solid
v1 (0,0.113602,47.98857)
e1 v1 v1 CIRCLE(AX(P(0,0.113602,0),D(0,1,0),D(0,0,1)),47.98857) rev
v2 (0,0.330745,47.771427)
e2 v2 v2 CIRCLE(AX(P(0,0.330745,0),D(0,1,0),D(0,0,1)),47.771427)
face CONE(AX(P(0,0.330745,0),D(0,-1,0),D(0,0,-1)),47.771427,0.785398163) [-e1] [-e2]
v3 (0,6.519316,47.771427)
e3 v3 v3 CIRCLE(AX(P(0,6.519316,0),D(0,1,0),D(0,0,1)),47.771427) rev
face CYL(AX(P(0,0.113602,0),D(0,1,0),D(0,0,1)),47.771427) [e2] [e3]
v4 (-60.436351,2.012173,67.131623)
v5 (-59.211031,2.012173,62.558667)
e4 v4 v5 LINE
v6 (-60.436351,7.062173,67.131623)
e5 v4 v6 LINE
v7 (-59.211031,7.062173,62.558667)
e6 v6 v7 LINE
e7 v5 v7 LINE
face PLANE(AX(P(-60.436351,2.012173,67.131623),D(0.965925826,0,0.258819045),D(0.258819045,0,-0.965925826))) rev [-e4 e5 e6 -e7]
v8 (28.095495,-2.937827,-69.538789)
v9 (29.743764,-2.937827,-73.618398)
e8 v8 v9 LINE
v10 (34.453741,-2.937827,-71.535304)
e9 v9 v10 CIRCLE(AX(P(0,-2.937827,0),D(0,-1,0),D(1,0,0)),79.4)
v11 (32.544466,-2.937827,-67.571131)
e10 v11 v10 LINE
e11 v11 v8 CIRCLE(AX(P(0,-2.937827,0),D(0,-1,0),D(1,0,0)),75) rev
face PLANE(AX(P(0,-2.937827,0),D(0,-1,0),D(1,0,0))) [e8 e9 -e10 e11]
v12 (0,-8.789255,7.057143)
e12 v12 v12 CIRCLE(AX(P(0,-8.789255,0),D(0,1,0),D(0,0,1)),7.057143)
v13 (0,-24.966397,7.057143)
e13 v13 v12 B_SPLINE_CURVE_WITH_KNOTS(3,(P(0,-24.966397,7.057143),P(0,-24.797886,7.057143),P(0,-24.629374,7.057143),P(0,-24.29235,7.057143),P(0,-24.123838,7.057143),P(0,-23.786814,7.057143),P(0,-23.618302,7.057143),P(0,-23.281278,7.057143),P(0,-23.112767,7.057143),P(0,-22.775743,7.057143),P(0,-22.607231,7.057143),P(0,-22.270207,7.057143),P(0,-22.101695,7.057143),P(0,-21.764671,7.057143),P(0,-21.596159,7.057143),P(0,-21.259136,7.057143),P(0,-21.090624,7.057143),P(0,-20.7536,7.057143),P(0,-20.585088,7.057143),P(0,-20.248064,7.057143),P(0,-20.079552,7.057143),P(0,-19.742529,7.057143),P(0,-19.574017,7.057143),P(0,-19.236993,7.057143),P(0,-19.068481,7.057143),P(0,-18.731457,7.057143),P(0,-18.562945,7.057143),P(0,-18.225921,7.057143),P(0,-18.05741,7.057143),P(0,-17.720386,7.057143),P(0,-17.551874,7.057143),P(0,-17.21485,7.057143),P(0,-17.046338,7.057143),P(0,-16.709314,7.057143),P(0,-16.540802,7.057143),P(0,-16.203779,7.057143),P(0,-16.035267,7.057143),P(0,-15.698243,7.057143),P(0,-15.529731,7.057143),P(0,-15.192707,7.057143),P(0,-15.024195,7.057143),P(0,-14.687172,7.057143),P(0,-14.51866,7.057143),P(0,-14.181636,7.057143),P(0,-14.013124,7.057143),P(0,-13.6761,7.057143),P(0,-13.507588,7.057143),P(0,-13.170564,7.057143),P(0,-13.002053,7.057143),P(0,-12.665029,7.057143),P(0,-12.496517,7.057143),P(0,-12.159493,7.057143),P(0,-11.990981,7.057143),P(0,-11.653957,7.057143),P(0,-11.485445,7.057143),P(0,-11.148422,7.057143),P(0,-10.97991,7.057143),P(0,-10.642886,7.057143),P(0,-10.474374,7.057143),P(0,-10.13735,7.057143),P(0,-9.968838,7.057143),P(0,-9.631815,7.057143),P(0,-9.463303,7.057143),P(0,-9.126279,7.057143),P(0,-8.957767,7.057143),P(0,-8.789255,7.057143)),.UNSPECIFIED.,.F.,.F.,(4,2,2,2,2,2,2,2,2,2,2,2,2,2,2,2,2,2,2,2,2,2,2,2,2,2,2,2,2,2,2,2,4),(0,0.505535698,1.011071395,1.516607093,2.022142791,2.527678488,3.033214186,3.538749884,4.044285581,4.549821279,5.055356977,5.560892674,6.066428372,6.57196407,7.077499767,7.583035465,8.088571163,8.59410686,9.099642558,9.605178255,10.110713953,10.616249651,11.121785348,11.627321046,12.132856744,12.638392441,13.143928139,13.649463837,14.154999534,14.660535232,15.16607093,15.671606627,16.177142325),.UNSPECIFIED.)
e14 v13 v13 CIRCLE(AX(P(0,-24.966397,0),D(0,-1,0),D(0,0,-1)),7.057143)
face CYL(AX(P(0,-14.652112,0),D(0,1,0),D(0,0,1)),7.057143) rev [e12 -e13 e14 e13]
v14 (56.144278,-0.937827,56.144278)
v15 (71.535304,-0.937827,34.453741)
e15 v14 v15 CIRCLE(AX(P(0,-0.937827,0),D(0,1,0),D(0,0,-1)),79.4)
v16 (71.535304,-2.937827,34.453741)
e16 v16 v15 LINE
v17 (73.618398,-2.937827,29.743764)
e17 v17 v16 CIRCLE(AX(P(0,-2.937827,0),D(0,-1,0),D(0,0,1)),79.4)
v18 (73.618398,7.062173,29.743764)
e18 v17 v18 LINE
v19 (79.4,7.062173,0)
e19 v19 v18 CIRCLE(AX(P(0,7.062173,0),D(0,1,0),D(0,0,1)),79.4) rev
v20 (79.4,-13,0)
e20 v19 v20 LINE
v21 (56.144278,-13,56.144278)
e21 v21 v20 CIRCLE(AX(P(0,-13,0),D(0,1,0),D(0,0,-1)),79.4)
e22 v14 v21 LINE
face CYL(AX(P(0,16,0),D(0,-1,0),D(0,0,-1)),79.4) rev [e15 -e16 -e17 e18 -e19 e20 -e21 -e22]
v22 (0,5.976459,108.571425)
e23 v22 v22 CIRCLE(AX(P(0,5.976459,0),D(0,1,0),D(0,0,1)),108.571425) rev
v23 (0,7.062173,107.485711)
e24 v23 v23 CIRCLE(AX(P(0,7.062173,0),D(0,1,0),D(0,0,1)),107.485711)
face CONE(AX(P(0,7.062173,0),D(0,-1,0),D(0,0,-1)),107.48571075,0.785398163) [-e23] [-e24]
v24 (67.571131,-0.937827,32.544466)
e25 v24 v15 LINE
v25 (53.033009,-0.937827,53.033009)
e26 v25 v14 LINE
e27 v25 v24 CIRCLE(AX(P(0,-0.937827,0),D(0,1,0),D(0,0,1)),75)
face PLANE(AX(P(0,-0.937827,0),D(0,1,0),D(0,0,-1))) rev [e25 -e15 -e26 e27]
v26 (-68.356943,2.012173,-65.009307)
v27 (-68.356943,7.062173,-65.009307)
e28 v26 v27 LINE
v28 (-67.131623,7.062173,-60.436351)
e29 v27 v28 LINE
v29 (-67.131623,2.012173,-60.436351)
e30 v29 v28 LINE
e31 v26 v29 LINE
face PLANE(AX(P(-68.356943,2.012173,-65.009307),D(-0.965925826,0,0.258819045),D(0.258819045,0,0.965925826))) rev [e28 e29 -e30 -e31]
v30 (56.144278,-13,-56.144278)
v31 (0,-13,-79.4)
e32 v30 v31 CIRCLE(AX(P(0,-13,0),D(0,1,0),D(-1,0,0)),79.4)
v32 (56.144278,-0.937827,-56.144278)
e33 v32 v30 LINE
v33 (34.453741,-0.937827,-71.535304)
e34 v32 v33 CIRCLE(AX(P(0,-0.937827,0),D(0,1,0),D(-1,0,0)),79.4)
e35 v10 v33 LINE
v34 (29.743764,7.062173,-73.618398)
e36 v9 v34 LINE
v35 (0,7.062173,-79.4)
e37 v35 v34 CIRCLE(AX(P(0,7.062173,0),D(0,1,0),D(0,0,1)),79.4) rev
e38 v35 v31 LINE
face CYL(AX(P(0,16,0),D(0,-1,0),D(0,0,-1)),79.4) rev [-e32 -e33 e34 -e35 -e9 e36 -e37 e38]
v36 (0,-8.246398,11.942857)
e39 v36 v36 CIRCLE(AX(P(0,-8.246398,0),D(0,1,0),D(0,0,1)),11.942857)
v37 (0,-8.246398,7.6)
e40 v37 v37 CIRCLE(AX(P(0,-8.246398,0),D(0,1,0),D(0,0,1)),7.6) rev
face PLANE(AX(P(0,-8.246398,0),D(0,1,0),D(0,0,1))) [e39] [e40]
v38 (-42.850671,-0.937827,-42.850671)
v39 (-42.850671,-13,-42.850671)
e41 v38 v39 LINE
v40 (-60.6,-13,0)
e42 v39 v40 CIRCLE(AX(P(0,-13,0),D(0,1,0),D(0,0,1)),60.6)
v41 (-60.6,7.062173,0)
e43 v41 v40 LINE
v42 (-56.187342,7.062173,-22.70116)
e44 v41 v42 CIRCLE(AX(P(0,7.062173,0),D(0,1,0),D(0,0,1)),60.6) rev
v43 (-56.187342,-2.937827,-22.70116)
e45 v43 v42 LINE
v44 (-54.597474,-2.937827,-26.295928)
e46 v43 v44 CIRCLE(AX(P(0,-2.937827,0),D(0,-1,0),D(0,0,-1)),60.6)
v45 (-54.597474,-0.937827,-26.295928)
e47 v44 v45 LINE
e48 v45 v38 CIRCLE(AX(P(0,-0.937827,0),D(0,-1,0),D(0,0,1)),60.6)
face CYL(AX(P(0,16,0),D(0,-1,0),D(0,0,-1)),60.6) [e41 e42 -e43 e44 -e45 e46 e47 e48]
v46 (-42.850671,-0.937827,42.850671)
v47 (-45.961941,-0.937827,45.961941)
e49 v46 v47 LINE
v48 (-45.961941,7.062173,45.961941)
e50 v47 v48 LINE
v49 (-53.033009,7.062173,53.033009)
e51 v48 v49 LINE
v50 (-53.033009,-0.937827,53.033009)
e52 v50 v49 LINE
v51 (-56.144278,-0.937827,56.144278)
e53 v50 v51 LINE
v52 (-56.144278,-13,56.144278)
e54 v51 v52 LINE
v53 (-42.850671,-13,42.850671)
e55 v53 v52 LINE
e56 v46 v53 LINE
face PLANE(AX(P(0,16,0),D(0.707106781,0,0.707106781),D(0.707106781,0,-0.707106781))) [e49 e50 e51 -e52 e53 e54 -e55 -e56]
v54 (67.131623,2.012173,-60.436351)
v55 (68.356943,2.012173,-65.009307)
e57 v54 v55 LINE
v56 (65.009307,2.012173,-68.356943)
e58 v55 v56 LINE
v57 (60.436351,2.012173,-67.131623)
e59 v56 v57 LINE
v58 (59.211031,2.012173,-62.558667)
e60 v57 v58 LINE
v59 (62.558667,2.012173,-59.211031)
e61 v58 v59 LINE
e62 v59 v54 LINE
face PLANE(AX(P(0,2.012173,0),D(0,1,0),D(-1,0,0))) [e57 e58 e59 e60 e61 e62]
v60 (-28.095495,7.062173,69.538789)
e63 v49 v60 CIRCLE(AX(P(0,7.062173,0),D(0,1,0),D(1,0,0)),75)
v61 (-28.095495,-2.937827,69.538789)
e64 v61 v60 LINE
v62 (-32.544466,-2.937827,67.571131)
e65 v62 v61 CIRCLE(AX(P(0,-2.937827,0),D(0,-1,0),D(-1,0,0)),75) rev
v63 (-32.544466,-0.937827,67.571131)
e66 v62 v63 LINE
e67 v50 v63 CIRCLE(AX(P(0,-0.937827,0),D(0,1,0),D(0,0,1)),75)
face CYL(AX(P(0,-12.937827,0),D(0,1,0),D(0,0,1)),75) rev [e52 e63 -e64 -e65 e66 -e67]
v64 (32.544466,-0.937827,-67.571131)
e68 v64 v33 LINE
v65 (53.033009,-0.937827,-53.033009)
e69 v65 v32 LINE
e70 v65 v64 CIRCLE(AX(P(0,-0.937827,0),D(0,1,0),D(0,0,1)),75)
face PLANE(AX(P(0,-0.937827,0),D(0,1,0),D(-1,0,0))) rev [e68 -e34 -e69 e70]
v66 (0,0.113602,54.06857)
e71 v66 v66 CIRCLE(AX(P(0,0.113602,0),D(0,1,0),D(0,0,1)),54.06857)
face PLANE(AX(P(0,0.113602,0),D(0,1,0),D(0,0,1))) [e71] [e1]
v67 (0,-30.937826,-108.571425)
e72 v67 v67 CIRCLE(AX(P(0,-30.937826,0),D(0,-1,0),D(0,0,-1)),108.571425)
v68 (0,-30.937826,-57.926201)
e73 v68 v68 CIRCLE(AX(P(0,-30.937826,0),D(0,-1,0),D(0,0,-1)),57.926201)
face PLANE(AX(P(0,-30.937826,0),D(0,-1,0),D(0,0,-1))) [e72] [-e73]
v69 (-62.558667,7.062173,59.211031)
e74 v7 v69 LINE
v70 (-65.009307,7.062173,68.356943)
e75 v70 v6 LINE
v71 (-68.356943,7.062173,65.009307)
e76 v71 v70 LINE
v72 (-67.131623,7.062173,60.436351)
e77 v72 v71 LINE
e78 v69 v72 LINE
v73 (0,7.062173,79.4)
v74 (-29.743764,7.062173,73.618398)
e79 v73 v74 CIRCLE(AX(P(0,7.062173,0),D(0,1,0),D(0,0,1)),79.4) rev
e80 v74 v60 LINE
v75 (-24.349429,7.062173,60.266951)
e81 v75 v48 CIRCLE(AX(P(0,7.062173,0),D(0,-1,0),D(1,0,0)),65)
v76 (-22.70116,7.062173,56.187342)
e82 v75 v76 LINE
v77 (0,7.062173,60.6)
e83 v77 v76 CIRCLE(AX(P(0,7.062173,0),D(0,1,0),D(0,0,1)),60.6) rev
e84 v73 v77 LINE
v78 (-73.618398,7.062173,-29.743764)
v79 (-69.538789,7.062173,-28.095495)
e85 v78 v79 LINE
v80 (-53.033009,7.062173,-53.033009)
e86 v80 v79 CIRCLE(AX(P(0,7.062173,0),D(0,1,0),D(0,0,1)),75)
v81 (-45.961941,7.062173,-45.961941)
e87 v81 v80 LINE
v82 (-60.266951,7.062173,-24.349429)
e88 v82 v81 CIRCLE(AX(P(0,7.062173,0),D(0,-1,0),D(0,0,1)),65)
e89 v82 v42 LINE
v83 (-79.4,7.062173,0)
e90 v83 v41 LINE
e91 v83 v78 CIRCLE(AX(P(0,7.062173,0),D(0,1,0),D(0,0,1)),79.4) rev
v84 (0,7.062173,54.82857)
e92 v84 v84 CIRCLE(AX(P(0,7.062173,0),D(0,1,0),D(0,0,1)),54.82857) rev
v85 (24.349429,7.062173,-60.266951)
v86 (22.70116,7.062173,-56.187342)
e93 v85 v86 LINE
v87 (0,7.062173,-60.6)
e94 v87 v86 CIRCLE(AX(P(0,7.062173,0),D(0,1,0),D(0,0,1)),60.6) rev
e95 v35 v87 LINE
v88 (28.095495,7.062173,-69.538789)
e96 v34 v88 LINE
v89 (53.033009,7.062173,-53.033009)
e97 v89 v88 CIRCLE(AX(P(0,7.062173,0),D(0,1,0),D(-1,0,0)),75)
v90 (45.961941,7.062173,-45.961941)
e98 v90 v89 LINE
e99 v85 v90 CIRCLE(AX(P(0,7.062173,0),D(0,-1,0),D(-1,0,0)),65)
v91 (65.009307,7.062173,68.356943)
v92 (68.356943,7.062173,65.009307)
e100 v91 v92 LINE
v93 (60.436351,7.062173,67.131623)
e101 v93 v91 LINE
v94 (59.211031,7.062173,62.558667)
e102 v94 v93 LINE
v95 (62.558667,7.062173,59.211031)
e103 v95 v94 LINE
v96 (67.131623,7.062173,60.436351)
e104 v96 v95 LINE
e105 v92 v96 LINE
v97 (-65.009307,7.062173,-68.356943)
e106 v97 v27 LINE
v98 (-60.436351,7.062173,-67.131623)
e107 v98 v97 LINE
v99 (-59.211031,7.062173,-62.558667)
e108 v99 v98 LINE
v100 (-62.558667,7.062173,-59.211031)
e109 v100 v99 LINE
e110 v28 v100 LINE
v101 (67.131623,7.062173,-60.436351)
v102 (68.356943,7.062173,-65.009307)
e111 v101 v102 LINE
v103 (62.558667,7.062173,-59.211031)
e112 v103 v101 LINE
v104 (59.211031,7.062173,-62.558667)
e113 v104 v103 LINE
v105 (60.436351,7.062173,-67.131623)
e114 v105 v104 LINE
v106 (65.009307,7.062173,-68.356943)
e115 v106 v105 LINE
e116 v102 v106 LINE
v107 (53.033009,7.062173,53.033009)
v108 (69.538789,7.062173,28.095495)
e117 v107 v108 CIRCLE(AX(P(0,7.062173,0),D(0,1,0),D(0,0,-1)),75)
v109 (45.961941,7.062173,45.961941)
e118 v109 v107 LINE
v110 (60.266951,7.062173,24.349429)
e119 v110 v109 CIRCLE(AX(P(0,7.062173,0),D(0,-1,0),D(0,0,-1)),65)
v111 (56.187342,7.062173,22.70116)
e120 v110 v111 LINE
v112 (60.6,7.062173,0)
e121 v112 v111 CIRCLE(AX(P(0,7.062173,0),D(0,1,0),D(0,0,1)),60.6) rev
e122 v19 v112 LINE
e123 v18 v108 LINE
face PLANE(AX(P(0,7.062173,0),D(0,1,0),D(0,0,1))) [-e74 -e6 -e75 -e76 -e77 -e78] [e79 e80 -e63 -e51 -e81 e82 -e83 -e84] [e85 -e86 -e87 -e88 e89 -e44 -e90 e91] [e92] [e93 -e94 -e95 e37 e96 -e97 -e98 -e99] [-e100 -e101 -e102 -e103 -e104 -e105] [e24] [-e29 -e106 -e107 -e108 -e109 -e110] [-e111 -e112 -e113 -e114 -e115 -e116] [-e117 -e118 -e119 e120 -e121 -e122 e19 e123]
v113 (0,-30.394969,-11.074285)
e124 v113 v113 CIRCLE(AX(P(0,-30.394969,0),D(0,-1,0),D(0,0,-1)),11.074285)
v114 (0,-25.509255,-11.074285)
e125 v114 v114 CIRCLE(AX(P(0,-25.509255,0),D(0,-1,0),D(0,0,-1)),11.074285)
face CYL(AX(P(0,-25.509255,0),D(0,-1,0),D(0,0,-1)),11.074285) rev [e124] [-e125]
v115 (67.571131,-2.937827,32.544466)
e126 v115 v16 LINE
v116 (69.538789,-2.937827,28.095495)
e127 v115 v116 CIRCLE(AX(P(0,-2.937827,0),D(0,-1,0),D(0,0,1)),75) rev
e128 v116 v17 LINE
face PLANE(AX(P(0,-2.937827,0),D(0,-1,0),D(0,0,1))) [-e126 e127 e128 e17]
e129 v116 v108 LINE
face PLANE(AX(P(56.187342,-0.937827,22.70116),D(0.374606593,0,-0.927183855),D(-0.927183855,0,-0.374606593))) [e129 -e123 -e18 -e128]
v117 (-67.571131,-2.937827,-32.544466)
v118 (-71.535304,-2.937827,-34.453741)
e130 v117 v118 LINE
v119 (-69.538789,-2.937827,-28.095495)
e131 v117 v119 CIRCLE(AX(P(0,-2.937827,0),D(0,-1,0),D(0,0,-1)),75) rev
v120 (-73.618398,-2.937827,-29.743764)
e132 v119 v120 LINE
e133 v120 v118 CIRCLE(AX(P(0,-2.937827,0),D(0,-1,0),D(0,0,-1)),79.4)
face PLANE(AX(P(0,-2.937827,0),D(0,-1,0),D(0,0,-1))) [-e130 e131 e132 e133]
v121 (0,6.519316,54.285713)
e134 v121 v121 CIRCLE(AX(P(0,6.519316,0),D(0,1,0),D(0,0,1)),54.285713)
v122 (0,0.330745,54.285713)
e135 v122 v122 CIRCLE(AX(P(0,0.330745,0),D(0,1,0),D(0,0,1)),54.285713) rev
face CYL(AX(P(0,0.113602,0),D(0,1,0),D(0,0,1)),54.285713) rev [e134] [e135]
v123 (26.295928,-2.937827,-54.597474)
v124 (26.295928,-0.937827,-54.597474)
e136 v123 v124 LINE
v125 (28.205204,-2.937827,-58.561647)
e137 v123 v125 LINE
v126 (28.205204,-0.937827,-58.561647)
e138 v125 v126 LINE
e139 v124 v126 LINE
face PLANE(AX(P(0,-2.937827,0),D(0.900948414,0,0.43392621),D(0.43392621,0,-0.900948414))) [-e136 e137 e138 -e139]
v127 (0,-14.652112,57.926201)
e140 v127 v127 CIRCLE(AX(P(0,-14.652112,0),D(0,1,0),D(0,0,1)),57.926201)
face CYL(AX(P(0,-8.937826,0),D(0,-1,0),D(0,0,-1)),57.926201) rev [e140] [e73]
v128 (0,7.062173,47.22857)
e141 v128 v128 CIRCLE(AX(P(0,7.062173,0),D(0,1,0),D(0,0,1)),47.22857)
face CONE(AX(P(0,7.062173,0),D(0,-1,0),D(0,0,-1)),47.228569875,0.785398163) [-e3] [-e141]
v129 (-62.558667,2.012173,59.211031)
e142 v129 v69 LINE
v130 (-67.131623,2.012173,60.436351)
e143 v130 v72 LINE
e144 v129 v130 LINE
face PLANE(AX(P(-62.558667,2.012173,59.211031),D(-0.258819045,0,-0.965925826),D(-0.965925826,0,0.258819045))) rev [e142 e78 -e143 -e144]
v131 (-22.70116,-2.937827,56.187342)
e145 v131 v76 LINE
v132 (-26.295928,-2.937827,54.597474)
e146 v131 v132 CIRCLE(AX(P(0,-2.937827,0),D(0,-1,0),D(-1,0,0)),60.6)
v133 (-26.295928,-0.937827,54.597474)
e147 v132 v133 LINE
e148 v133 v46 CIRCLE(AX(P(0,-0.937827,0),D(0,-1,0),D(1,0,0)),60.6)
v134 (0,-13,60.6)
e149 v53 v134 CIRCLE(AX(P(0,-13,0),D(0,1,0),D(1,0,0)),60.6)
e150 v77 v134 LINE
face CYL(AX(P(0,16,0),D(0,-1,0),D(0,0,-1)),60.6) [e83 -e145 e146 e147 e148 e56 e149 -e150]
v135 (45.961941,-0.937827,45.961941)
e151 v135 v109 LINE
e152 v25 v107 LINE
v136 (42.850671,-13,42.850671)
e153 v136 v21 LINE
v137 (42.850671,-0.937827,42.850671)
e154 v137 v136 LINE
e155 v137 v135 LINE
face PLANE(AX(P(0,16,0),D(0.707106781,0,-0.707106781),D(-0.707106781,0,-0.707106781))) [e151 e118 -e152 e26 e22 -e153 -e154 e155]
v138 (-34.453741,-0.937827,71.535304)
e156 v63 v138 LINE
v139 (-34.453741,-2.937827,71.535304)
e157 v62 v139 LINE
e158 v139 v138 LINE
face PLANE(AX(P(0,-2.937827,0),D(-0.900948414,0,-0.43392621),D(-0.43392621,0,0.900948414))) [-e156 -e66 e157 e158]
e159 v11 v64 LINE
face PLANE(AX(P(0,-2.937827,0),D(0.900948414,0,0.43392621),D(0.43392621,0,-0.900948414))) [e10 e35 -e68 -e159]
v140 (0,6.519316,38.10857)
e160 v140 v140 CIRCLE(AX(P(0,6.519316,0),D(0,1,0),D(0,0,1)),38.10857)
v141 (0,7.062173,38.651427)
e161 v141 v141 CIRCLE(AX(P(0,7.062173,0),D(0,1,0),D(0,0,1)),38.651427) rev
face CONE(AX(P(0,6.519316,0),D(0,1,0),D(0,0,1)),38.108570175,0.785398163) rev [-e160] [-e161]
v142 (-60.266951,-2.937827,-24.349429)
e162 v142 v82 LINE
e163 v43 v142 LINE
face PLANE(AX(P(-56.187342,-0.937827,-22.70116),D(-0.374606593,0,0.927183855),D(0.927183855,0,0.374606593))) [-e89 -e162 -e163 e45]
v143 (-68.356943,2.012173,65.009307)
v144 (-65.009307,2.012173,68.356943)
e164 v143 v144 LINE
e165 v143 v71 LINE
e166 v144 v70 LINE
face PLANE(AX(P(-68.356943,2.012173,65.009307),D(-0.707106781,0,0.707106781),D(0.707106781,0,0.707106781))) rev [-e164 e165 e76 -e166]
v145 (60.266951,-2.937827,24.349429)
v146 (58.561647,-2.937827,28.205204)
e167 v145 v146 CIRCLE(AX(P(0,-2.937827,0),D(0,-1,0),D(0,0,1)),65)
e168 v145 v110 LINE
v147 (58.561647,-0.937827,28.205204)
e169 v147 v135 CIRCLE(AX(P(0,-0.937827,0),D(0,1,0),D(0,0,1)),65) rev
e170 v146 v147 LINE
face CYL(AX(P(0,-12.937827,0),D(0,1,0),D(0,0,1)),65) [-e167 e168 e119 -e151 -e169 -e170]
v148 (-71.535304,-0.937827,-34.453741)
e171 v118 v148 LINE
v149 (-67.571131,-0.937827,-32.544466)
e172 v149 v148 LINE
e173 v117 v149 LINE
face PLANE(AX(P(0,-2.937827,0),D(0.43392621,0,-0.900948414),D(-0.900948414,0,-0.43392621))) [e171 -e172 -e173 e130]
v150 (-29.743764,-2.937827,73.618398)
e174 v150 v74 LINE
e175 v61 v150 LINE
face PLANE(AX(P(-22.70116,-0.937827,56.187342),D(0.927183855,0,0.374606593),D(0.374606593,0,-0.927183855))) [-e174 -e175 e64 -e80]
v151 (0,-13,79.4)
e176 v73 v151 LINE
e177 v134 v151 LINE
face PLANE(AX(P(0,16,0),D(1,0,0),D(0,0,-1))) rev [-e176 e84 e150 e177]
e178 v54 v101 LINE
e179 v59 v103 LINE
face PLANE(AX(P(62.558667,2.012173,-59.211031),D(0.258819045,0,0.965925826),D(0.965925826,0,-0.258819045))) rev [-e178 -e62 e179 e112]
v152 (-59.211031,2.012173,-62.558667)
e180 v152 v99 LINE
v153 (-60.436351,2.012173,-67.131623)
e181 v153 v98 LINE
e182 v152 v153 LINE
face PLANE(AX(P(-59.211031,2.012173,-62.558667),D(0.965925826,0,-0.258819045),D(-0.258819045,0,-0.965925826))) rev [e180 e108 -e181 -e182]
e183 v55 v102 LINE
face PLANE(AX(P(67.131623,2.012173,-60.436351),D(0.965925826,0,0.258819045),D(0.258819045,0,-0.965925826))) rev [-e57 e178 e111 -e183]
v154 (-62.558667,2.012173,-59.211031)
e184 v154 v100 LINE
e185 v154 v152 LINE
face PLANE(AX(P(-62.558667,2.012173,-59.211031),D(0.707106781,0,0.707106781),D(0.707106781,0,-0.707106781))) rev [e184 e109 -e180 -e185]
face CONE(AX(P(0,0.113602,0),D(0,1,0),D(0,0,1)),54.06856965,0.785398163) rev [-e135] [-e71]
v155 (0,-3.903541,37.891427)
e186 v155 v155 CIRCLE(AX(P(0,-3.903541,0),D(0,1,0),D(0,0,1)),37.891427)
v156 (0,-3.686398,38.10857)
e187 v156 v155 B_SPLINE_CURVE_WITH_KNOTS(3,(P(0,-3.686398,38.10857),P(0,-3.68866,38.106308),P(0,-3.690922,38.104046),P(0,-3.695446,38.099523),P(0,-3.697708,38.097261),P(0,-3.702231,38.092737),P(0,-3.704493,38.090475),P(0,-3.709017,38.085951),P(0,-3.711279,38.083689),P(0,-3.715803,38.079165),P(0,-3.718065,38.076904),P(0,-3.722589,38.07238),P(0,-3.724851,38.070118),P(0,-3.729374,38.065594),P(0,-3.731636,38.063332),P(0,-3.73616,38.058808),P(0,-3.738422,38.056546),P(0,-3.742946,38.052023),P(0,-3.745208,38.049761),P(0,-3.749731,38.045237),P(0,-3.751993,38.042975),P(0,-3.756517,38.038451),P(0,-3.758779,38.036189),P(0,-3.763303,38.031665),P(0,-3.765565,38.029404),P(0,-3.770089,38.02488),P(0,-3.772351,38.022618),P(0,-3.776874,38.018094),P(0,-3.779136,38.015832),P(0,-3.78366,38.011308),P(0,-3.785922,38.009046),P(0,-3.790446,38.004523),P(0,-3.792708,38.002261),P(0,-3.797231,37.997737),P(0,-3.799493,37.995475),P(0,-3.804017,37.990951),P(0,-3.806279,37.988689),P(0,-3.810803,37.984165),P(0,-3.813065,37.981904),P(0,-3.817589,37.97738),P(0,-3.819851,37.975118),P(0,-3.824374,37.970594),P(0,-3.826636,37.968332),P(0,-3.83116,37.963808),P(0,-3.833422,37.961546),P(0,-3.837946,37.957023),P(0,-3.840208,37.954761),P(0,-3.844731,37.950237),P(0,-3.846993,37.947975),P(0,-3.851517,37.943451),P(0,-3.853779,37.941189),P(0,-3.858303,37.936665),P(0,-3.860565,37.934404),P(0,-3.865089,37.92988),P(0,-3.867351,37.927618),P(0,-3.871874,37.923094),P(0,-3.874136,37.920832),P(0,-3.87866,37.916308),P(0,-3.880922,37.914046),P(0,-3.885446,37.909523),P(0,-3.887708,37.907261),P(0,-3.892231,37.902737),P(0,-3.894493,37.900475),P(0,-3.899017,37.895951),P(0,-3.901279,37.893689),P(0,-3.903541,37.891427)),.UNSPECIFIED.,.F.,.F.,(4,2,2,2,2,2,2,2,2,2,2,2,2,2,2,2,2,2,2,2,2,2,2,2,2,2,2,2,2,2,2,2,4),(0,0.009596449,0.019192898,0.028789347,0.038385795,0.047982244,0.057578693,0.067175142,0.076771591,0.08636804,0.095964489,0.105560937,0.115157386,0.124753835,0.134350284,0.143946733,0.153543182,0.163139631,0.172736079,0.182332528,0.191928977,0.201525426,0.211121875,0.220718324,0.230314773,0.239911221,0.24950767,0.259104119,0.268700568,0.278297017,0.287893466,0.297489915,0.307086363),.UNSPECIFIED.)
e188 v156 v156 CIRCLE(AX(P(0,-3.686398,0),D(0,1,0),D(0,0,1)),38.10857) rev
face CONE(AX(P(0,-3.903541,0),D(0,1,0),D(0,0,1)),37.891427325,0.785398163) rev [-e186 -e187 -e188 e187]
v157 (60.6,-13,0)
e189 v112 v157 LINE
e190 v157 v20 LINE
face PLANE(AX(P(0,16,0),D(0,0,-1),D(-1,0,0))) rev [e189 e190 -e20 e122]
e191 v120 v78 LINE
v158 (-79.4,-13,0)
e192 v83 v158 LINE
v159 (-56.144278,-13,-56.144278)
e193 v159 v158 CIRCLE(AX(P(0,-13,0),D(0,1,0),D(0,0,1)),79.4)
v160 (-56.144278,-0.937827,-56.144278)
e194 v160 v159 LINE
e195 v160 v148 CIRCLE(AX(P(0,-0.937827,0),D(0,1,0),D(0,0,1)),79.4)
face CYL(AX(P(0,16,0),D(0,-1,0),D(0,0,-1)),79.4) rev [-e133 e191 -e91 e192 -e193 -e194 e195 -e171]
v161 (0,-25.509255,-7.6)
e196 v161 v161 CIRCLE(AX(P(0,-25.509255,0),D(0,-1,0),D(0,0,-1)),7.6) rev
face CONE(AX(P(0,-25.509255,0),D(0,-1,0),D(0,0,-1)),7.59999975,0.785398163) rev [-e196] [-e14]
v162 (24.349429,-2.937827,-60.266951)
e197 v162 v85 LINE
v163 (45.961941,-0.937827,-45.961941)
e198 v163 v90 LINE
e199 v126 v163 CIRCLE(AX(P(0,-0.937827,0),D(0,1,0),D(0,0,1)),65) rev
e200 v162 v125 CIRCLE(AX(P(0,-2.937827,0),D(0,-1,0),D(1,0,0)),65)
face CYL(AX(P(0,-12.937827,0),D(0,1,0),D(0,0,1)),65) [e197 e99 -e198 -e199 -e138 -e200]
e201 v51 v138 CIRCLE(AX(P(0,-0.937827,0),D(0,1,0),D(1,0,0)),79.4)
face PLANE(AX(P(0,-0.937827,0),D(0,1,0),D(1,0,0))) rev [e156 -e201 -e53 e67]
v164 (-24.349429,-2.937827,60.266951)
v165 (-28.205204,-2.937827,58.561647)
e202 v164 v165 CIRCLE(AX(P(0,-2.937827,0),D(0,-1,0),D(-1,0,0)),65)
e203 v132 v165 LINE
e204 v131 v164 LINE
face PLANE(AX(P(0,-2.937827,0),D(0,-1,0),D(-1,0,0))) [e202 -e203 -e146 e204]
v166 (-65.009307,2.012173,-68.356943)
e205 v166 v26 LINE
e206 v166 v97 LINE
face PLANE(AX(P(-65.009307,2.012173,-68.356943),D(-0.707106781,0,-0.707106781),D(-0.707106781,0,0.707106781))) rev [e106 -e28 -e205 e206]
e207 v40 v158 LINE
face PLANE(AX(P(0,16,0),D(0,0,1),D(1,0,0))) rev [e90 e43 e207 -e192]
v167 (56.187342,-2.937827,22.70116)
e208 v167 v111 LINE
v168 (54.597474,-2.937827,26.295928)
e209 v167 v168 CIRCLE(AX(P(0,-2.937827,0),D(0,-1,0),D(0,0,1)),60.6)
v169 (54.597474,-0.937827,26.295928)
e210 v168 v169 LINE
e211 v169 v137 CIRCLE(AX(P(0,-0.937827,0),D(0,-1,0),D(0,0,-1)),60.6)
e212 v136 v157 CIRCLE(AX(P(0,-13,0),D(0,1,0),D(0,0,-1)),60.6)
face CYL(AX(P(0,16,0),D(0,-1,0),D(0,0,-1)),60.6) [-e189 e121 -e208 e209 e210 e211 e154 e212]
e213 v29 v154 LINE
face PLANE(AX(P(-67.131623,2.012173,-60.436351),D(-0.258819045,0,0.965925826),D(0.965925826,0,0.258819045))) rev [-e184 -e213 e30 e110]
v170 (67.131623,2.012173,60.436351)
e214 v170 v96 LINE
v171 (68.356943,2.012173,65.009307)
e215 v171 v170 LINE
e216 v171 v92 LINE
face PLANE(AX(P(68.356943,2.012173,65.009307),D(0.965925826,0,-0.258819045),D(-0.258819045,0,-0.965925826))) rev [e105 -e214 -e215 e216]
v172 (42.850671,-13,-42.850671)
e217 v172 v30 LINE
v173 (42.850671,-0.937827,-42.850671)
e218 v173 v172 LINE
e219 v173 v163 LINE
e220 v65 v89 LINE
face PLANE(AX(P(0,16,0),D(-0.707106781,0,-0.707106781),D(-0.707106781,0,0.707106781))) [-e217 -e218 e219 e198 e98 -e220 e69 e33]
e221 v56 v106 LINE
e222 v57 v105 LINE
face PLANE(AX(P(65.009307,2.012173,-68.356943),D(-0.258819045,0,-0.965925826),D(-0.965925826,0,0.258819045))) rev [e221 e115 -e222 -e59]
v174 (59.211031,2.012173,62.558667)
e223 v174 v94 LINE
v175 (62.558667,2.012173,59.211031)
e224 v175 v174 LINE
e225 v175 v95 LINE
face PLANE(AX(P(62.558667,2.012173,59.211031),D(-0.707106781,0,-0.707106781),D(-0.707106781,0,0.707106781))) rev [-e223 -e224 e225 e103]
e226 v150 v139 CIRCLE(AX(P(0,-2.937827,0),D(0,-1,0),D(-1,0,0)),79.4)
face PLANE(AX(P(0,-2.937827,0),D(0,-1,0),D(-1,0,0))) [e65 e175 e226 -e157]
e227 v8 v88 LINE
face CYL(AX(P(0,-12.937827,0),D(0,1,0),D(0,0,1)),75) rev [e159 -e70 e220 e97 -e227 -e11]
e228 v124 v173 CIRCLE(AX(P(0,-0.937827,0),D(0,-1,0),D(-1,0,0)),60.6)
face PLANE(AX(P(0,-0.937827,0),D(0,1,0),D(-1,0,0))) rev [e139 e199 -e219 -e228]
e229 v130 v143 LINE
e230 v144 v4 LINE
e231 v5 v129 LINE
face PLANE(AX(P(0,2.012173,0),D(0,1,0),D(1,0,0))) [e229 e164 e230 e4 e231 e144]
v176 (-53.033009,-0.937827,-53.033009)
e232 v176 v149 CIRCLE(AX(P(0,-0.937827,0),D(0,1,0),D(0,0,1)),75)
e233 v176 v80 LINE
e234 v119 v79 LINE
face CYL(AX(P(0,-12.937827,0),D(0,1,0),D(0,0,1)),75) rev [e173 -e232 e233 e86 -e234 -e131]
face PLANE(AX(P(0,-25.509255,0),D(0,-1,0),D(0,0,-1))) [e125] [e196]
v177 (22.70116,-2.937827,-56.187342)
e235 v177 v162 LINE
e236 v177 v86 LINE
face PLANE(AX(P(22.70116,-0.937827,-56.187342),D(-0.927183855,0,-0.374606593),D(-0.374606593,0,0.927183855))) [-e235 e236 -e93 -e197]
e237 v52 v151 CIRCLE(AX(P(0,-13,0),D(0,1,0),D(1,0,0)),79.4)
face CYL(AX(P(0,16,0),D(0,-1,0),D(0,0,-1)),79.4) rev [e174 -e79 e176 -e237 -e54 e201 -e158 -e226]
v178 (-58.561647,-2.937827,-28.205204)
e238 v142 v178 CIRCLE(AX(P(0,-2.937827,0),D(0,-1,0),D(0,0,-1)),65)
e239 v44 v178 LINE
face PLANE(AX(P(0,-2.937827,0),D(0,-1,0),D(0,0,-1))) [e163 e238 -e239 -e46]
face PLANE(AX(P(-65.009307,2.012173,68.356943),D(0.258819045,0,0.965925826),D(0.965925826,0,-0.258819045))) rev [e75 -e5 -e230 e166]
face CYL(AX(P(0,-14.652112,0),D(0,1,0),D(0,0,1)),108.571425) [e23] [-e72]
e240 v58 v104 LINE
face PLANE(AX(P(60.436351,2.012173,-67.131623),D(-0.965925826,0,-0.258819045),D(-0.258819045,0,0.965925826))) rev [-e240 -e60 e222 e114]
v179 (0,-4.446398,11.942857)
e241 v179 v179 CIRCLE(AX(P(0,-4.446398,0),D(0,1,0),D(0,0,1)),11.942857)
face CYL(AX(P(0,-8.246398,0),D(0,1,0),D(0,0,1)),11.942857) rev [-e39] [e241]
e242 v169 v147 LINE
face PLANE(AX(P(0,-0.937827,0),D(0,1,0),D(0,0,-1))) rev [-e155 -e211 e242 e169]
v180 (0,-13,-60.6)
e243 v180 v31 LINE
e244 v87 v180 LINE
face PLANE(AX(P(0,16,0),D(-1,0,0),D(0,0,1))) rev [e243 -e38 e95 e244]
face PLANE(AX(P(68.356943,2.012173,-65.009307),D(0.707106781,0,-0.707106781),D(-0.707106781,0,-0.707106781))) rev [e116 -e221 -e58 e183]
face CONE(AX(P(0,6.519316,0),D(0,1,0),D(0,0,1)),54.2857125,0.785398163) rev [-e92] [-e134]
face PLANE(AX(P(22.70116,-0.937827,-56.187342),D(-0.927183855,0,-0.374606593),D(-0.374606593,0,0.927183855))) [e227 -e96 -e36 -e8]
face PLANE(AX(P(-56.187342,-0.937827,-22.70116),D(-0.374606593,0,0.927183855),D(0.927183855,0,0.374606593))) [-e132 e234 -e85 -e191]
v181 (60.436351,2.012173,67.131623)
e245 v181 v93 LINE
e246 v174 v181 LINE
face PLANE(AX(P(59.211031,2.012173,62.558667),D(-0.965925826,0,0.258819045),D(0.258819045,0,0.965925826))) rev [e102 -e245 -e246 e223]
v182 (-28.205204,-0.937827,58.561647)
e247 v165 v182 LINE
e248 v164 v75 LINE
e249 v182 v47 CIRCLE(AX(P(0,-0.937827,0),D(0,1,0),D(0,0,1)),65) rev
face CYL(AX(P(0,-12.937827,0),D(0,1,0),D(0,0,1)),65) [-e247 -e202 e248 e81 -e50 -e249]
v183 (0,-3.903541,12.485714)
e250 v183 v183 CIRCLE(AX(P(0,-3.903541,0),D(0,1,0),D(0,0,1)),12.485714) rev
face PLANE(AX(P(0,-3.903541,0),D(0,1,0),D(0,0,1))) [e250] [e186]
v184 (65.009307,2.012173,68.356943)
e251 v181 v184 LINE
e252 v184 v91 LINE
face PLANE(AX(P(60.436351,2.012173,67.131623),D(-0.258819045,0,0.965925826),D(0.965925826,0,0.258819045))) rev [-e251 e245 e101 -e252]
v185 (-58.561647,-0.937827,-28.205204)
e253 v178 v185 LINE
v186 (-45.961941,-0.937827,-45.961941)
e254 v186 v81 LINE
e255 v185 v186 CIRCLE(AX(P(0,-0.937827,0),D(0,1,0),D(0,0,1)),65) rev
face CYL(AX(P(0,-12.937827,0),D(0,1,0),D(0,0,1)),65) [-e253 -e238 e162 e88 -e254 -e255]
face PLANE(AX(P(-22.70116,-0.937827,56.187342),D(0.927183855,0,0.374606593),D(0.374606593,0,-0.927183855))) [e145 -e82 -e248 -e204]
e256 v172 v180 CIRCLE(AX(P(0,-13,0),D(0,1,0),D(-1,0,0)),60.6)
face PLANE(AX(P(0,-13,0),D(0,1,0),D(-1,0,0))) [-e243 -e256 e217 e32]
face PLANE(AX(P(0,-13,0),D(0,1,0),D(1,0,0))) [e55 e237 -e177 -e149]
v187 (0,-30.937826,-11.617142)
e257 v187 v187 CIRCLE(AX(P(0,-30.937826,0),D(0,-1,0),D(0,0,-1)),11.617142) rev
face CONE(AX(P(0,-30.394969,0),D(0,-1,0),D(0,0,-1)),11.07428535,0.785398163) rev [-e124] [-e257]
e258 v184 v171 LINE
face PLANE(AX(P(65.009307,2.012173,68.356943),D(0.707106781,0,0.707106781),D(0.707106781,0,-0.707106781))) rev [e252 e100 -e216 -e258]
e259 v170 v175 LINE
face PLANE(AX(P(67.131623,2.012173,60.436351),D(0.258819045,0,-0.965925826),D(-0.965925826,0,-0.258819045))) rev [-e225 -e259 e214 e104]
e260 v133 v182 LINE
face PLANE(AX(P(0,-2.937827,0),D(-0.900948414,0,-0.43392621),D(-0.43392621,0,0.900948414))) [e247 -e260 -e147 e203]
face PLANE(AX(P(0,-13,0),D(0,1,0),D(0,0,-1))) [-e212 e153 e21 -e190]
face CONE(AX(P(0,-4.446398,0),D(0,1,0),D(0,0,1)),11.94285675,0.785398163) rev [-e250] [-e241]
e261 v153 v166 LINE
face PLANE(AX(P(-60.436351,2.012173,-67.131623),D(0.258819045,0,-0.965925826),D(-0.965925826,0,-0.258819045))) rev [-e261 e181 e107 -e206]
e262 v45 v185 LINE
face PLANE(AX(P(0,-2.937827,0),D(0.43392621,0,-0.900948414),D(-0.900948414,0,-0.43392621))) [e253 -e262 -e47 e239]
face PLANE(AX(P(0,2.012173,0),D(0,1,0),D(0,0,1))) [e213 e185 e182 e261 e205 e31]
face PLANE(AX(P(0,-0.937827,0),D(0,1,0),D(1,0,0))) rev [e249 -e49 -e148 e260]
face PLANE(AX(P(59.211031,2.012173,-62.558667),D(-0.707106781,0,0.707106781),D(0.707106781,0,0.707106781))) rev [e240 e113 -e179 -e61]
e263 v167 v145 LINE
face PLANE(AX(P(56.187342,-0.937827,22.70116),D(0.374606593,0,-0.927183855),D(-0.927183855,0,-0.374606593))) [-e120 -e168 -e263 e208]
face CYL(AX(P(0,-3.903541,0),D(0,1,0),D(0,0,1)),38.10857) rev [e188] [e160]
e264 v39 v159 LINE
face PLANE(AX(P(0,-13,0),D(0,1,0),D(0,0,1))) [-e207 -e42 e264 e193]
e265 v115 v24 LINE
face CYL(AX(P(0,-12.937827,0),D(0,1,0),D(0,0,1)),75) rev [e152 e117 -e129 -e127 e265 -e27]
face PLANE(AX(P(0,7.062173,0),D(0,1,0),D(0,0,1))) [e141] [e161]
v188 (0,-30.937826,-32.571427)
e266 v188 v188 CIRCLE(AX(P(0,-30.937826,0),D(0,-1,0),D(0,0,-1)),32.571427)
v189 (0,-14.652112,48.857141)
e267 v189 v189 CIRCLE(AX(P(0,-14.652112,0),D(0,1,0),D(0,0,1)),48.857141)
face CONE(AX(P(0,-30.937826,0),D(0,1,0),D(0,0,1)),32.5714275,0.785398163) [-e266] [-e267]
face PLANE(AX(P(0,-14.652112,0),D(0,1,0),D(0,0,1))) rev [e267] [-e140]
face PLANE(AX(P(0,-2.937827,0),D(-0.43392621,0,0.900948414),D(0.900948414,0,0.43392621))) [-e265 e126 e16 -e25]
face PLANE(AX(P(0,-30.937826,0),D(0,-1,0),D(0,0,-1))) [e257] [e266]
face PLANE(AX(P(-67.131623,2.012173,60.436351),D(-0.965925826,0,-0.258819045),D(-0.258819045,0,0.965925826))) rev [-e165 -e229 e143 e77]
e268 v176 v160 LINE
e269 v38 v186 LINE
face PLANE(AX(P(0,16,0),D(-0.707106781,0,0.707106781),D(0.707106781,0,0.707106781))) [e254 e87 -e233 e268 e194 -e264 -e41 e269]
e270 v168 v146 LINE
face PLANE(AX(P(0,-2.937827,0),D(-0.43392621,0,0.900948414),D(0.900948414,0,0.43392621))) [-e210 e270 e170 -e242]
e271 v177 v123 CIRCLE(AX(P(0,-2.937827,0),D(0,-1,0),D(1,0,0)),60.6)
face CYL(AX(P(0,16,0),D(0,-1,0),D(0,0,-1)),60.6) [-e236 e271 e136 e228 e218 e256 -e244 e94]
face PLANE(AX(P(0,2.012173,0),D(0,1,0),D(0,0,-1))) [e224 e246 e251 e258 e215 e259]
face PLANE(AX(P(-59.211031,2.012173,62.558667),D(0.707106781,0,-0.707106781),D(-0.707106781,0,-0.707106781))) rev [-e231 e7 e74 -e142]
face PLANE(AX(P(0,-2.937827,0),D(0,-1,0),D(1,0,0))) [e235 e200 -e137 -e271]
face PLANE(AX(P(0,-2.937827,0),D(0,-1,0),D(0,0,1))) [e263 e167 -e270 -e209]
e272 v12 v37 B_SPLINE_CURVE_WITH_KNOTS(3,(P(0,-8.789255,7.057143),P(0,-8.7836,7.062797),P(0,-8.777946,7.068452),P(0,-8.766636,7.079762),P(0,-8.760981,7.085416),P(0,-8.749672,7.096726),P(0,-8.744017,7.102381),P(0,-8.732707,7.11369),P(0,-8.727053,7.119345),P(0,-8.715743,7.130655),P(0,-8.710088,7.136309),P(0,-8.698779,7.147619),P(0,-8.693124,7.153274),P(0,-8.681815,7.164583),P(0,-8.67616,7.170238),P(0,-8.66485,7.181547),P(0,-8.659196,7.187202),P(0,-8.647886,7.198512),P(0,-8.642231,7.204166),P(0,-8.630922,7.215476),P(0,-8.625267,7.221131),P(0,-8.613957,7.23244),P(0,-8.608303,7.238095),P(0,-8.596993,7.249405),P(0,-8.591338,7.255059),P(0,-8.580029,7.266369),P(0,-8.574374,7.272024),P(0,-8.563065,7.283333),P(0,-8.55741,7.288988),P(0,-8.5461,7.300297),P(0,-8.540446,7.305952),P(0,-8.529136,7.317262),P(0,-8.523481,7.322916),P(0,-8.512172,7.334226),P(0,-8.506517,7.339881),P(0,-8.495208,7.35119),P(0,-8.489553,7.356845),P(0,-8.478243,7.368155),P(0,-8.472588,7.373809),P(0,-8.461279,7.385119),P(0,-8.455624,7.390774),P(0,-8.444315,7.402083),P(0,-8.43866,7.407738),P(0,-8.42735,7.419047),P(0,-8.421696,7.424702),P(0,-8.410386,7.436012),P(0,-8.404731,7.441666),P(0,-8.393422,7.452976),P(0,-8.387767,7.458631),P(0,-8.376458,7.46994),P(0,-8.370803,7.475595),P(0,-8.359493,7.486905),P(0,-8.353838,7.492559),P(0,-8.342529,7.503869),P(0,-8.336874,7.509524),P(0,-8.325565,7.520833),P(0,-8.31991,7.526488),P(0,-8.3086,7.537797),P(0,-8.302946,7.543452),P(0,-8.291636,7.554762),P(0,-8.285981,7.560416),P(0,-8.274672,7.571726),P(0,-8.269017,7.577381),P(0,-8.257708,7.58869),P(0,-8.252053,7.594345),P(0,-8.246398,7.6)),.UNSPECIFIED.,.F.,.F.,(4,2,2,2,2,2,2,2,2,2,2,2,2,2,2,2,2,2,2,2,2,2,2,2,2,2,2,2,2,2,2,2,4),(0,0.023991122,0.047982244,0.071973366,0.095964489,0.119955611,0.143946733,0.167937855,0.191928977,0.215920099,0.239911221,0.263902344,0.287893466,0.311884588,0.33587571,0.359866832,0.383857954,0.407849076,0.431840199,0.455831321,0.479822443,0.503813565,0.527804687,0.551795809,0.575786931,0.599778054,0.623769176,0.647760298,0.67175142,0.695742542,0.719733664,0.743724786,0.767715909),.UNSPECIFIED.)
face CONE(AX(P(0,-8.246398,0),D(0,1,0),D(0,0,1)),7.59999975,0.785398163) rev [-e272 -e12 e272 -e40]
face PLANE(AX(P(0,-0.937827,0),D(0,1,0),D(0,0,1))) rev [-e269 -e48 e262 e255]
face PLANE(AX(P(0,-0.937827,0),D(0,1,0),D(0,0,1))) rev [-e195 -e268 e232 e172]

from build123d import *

# Parameters (mm, degrees)
SKETCH2_R                 = 50
BOSS_EXTRUDE1_DEPTH       = 10
SKETCH8_R                 = 17.55
CUT_EXTRUDE4_DEPTH        = 5.05
SKETCH12_R                = 3.25
CUT_EXTRUDE7_DEPTH        = 71.890778667
SKETCH13_R                = 5.5
CUT_EXTRUDE8_DEPTH        = 2
SKETCH14_R                = 15
SKETCH14_R_2              = 3.25
BOSS_EXTRUDE3_DEPTH       = 7.5
CHAMFER1_SIZE             = 7.5
SKETCH15_R                = 5.1
CUT_EXTRUDE9_DEPTH        = 2.5
CHAFL_N2_SIZE             = 0.5
SKETCH16_R                = 25
SKETCH16_R_2              = 22
CUT_EXTRUDE10_DEPTH       = 3.2
CHAMFER2_SIZE             = 0.1
CHAMFER3_SIZE             = 0.25
CHAMFER5_SIZE             = 0.25
SCALE1_SCALE              = 2.1714285
BOSS_EXTRUDE4_START       = -17.3714281
BOSS_EXTRUDE4_OUTLINE_R   = 108.571425
BOSS_EXTRUDE4_OUTLINE_R_2 = 57.926200599
BOSS_EXTRUDE4_DEPTH       = 17.3714281
BOSS_EXTRUDE5_START       = -5
SKETCH17_3_R              = 100.830783289
SKETCH17_3_R_2            = 57.926200599
BOSS_EXTRUDE5_DEPTH       = 5
CUT_EXTRUDE11_DEPTH       = 5.05
CIRPATTERN1_COUNT         = 4
CUT_EXTRUDE12_START       = -13
CUT_EXTRUDE12_DEPTH       = 29
BOSS_EXTRUDE6_START       = -8
BOSS_EXTRUDE6_DEPTH       = 8
CUT_EXTRUDE13_DEPTH       = 20
BOSS_EXTRUDE7_START       = 2
BOSS_EXTRUDE7_DEPTH       = 2
CIRPATTERN2_COUNT         = 4
CIRPATTERN3_COUNT         = 4


# Read off the part's stored shape, not the designer's step: Boss-Extrude4
with BuildPart() as part:
    # Sketch2 → Boss-Extrude1 (new body)
    with BuildSketch(Plane(origin=(0, 0, 0), x_dir=(1, 0, 0), z_dir=(0, 1, 0))):
        with Locations(Location((0, 0, 0), (0, 0, 270))):
            Circle(SKETCH2_R)
    extrude(amount=-BOSS_EXTRUDE1_DEPTH)

    # Sketch8 → Cut-Extrude4 (cut)
    with BuildSketch(Plane(origin=(0, 0, 0), x_dir=(1, 0, 0), z_dir=(0, 1, 0))):
        with Locations(Location((0, 0, 0), (0, 0, 270))):
            Circle(SKETCH8_R)
    extrude(amount=-CUT_EXTRUDE4_DEPTH, mode=Mode.SUBTRACT)

    # Sketch12 → Cut-Extrude7 (cut, through all)
    with BuildSketch(Plane(origin=(0, -5.05, 0), x_dir=(1, 0, 0), z_dir=(0, 1, 0))):
        with Locations(Location((0, 0, 0), (0, 0, 270))):
            Circle(SKETCH12_R)
    extrude(amount=-CUT_EXTRUDE7_DEPTH, mode=Mode.SUBTRACT)

    # Sketch13 → Cut-Extrude8 (cut)
    with BuildSketch(Plane(origin=(0, -5.05, 0), x_dir=(1, 0, 0), z_dir=(0, 1, 0))):
        with Locations(Location((0, 0, 0), (0, 0, 270))):
            Circle(SKETCH13_R)
    extrude(amount=-CUT_EXTRUDE8_DEPTH, mode=Mode.SUBTRACT)

    # Sketch14 → Boss-Extrude3 (add)
    with BuildSketch(Plane.XZ.offset(10)):
        with Locations(Location((0, 0, 0), (0, 0, 90))):
            Circle(SKETCH14_R)
        with Locations(Location((0, 0, 0), (0, 0, 90))):
            Circle(SKETCH14_R_2, mode=Mode.SUBTRACT)
    extrude(amount=BOSS_EXTRUDE3_DEPTH)

    # Chamfer1
    chamfer1_edges = [part.edges().sort_by_distance(p)[0] for p in [
        (0, -10, -15),
    ]]
    chamfer(chamfer1_edges, length=CHAMFER1_SIZE - 0.0001)  # a hair under: the kernel refuses the full size

    # Sketch15 → Cut-Extrude9 (cut)
    with BuildSketch(Plane.XZ.offset(17.5)):
        with Locations(Location((0, 0, 0), (0, 0, 270))):
            Circle(SKETCH15_R)
    extrude(amount=-CUT_EXTRUDE9_DEPTH, mode=Mode.SUBTRACT)

    # Chaflán2
    chafl_n2_edges = [part.edges().sort_by_distance(p)[0] for p in [
        (0, 0, -50),
        (0, -10, -50),
    ]]
    chamfer(chafl_n2_edges, length=CHAFL_N2_SIZE)

    # Sketch16 → Cut-Extrude10 (cut)
    with BuildSketch(Plane(origin=(0, 0, 0), x_dir=(1, 0, 0), z_dir=(0, 1, 0))):
        with Locations(Location((0, 0, 0), (0, 0, 270))):
            Circle(SKETCH16_R)
        with Locations(Location((0, 0, 0), (0, 0, 270))):
            Circle(SKETCH16_R_2, mode=Mode.SUBTRACT)
    extrude(amount=-CUT_EXTRUDE10_DEPTH, mode=Mode.SUBTRACT)

    # Chamfer2
    chamfer2_edges = [part.edges().sort_by_distance(p)[0] for p in [
        (0, -3.2, -25),
        (0, -3.2, -22),
        (0, -5.05, -17.55),
    ]]
    chamfer(chamfer2_edges, length=CHAMFER2_SIZE)

    # Chamfer3
    chamfer3_edges = [part.edges().sort_by_distance(p)[0] for p in [
        (0, -5.05, -5.5),
        (0, -7.05, -3.25),
        (0, 0, -25),
        (0, 0, -22),
        (0, 0, -17.55),
    ]]
    chamfer(chamfer3_edges, length=CHAMFER3_SIZE)

    # Chamfer5
    chamfer5_edges = [part.edges().sort_by_distance(p)[0] for p in [
        (0, -17.5, 5.1),
        (0, -15, -3.25),
    ]]
    chamfer(chamfer5_edges, length=CHAMFER5_SIZE)


with BuildPart() as part_1:
    # Scale1: scaled about (0, -6.02867632, 0)
    add(part.part.scale(SCALE1_SCALE).moved(Location((0, 7.062163259, 0))))

    # Boss-Extrude4 outline → Boss-Extrude4 (add)
    with BuildSketch(Plane.XZ.offset(30.93782581).offset(BOSS_EXTRUDE4_START)):
        Circle(BOSS_EXTRUDE4_OUTLINE_R)
        Circle(BOSS_EXTRUDE4_OUTLINE_R_2, mode=Mode.SUBTRACT)
    extrude(amount=BOSS_EXTRUDE4_DEPTH)

    # Sketch17<3> → Boss-Extrude5 (add)
    with BuildSketch(Plane.XZ.offset(30.93782581).offset(BOSS_EXTRUDE5_START)):
        Circle(SKETCH17_3_R)
        with Locations(Location((0, 0, 0), (0, 0, 270))):
            Circle(SKETCH17_3_R_2, mode=Mode.SUBTRACT)
    extrude(amount=BOSS_EXTRUDE5_DEPTH)

    # Sketch18 → Cut-Extrude11 (cut)
    with BuildSketch(Plane(origin=(0, 7.06217294, 0), x_dir=(1, 0, 0), z_dir=(0, 1, 0))):
        Polygon((-65.009306884, 68.356942866), (-68.356942866, 65.009306884), (-67.131623054, 60.43635109), (-62.55866726, 59.211031278), (-59.211031278, 62.55866726), (-60.43635109, 67.131623054), align=None)
    cut_extrude11 = extrude(amount=-CUT_EXTRUDE11_DEPTH, mode=Mode.SUBTRACT)

    # CirPattern1: Cut-Extrude11 ×4 about axis
    cirpattern1_axis = Axis((0, 0, 0), (0, 1, 0))
    for i in range(1, CIRPATTERN1_COUNT):
        add(cut_extrude11.rotate(cirpattern1_axis, i * 360 / CIRPATTERN1_COUNT), mode=Mode.SUBTRACT)

    # Sketch19 → Cut-Extrude12 (cut)
    with BuildSketch(Plane(origin=(0, 0, 0), x_dir=(1, 0, 0), z_dir=(0, 1, 0)).offset(CUT_EXTRUDE12_START)):
        with BuildLine():
            Line((-79.4, 0), (-60.6, 0))
            ThreePointArc((-60.6, 0), (-55.98709967, 23.190616001), (-42.85067094, 42.85067094))
            Line((-42.85067094, 42.85067094), (-43.15860775, 43.15860775))
            Line((-43.15860775, 43.15860775), (-56.144278426, 56.144278426))
            ThreePointArc((-56.144278426, 56.144278426), (-73.356034881, 30.38506453), (-79.4, 0))
        make_face()
    cut_extrude12 = extrude(amount=CUT_EXTRUDE12_DEPTH, mode=Mode.SUBTRACT)

    # Sketch20 → Boss-Extrude6 (add)
    with BuildSketch(Plane(origin=(0, 7.06217294, 0), x_dir=(1, 0, 0), z_dir=(0, 1, 0)).offset(BOSS_EXTRUDE6_START)):
        with BuildLine():
            Line((-56.187341587, 22.701159561), (-73.618398053, 29.743763517))
            ThreePointArc((-73.618398053, 29.743763517), (-66.210534272, 43.823796634), (-56.144278426, 56.144278426))
            Line((-56.144278426, 56.144278426), (-42.85067094, 42.85067094))
            ThreePointArc((-42.85067094, 42.85067094), (-50.533480817, 33.44738131), (-56.187341587, 22.701159561))
        make_face()
    boss_extrude6 = extrude(amount=BOSS_EXTRUDE6_DEPTH)

    # Sketch21 → Cut-Extrude13 (cut)
    with BuildSketch(Plane(origin=(0, 7.06217294, 0), x_dir=(1, 0, 0), z_dir=(0, 1, 0))):
        with BuildLine():
            Line((-45.961940777, 45.961940777), (-53.033008589, 53.033008589))
            ThreePointArc((-53.033008589, 53.033008589), (-62.541436655, 41.395273898), (-69.538789093, 28.095494506))
            Line((-69.538789093, 28.095494506), (-60.266950547, 24.349428572))
            ThreePointArc((-60.266950547, 24.349428572), (-54.202578434, 35.875904045), (-45.961940777, 45.961940777))
        make_face()
    cut_extrude13 = extrude(amount=-CUT_EXTRUDE13_DEPTH, mode=Mode.SUBTRACT)

    # Sketch22 → Boss-Extrude7 (add)
    with BuildSketch(Plane.XZ.offset(0.93782706).offset(BOSS_EXTRUDE7_START)):
        with BuildLine():
            Line((-58.561646908, -28.205203623), (-54.597473887, -26.295928301))
            ThreePointArc((-54.597473887, -26.295928301), (-55.421561016, -24.511437627), (-56.187341587, -22.701159561))
            Line((-56.187341587, -22.701159561), (-60.266950547, -24.349428572))
            ThreePointArc((-60.266950547, -24.349428572), (-59.445568746, -26.29114597), (-58.561646908, -28.205203623))
        make_face()
        with BuildLine():
            ThreePointArc((-67.571131048, -32.544465719), (-68.591040861, -30.335937658), (-69.538789093, -28.095494506))
            Line((-69.538789093, -28.095494506), (-73.618398053, -29.743763517))
            ThreePointArc((-73.618398053, -29.743763517), (-72.615048592, -32.115646), (-71.535304069, -34.453741041))
            Line((-71.535304069, -34.453741041), (-67.571131048, -32.544465719))
        make_face()
    boss_extrude7 = extrude(amount=-BOSS_EXTRUDE7_DEPTH)

    # CirPattern2: Cut-Extrude12, Boss-Extrude6, Cut-Extrude13 ×4 about axis
    cirpattern2_axis = Axis((0, 6.519315815, 0), (0, 1, 0))
    add([cut_extrude12.rotate(cirpattern2_axis, i * 360 / CIRPATTERN2_COUNT) for i in range(1, CIRPATTERN2_COUNT)], mode=Mode.SUBTRACT)
    add([boss_extrude6.rotate(cirpattern2_axis, i * 360 / CIRPATTERN2_COUNT) for i in range(1, CIRPATTERN2_COUNT)])
    add([cut_extrude13.rotate(cirpattern2_axis, i * 360 / CIRPATTERN2_COUNT) for i in range(1, CIRPATTERN2_COUNT)], mode=Mode.SUBTRACT)

    # CirPattern3: Boss-Extrude7 ×4 about axis
    cirpattern3_axis = Axis((0, -8.246397985, 0), (0, 1, 0))
    for i in range(1, CIRPATTERN3_COUNT):
        add(boss_extrude7.rotate(cirpattern3_axis, i * 360 / CIRPATTERN3_COUNT))


solid = part_1.part
